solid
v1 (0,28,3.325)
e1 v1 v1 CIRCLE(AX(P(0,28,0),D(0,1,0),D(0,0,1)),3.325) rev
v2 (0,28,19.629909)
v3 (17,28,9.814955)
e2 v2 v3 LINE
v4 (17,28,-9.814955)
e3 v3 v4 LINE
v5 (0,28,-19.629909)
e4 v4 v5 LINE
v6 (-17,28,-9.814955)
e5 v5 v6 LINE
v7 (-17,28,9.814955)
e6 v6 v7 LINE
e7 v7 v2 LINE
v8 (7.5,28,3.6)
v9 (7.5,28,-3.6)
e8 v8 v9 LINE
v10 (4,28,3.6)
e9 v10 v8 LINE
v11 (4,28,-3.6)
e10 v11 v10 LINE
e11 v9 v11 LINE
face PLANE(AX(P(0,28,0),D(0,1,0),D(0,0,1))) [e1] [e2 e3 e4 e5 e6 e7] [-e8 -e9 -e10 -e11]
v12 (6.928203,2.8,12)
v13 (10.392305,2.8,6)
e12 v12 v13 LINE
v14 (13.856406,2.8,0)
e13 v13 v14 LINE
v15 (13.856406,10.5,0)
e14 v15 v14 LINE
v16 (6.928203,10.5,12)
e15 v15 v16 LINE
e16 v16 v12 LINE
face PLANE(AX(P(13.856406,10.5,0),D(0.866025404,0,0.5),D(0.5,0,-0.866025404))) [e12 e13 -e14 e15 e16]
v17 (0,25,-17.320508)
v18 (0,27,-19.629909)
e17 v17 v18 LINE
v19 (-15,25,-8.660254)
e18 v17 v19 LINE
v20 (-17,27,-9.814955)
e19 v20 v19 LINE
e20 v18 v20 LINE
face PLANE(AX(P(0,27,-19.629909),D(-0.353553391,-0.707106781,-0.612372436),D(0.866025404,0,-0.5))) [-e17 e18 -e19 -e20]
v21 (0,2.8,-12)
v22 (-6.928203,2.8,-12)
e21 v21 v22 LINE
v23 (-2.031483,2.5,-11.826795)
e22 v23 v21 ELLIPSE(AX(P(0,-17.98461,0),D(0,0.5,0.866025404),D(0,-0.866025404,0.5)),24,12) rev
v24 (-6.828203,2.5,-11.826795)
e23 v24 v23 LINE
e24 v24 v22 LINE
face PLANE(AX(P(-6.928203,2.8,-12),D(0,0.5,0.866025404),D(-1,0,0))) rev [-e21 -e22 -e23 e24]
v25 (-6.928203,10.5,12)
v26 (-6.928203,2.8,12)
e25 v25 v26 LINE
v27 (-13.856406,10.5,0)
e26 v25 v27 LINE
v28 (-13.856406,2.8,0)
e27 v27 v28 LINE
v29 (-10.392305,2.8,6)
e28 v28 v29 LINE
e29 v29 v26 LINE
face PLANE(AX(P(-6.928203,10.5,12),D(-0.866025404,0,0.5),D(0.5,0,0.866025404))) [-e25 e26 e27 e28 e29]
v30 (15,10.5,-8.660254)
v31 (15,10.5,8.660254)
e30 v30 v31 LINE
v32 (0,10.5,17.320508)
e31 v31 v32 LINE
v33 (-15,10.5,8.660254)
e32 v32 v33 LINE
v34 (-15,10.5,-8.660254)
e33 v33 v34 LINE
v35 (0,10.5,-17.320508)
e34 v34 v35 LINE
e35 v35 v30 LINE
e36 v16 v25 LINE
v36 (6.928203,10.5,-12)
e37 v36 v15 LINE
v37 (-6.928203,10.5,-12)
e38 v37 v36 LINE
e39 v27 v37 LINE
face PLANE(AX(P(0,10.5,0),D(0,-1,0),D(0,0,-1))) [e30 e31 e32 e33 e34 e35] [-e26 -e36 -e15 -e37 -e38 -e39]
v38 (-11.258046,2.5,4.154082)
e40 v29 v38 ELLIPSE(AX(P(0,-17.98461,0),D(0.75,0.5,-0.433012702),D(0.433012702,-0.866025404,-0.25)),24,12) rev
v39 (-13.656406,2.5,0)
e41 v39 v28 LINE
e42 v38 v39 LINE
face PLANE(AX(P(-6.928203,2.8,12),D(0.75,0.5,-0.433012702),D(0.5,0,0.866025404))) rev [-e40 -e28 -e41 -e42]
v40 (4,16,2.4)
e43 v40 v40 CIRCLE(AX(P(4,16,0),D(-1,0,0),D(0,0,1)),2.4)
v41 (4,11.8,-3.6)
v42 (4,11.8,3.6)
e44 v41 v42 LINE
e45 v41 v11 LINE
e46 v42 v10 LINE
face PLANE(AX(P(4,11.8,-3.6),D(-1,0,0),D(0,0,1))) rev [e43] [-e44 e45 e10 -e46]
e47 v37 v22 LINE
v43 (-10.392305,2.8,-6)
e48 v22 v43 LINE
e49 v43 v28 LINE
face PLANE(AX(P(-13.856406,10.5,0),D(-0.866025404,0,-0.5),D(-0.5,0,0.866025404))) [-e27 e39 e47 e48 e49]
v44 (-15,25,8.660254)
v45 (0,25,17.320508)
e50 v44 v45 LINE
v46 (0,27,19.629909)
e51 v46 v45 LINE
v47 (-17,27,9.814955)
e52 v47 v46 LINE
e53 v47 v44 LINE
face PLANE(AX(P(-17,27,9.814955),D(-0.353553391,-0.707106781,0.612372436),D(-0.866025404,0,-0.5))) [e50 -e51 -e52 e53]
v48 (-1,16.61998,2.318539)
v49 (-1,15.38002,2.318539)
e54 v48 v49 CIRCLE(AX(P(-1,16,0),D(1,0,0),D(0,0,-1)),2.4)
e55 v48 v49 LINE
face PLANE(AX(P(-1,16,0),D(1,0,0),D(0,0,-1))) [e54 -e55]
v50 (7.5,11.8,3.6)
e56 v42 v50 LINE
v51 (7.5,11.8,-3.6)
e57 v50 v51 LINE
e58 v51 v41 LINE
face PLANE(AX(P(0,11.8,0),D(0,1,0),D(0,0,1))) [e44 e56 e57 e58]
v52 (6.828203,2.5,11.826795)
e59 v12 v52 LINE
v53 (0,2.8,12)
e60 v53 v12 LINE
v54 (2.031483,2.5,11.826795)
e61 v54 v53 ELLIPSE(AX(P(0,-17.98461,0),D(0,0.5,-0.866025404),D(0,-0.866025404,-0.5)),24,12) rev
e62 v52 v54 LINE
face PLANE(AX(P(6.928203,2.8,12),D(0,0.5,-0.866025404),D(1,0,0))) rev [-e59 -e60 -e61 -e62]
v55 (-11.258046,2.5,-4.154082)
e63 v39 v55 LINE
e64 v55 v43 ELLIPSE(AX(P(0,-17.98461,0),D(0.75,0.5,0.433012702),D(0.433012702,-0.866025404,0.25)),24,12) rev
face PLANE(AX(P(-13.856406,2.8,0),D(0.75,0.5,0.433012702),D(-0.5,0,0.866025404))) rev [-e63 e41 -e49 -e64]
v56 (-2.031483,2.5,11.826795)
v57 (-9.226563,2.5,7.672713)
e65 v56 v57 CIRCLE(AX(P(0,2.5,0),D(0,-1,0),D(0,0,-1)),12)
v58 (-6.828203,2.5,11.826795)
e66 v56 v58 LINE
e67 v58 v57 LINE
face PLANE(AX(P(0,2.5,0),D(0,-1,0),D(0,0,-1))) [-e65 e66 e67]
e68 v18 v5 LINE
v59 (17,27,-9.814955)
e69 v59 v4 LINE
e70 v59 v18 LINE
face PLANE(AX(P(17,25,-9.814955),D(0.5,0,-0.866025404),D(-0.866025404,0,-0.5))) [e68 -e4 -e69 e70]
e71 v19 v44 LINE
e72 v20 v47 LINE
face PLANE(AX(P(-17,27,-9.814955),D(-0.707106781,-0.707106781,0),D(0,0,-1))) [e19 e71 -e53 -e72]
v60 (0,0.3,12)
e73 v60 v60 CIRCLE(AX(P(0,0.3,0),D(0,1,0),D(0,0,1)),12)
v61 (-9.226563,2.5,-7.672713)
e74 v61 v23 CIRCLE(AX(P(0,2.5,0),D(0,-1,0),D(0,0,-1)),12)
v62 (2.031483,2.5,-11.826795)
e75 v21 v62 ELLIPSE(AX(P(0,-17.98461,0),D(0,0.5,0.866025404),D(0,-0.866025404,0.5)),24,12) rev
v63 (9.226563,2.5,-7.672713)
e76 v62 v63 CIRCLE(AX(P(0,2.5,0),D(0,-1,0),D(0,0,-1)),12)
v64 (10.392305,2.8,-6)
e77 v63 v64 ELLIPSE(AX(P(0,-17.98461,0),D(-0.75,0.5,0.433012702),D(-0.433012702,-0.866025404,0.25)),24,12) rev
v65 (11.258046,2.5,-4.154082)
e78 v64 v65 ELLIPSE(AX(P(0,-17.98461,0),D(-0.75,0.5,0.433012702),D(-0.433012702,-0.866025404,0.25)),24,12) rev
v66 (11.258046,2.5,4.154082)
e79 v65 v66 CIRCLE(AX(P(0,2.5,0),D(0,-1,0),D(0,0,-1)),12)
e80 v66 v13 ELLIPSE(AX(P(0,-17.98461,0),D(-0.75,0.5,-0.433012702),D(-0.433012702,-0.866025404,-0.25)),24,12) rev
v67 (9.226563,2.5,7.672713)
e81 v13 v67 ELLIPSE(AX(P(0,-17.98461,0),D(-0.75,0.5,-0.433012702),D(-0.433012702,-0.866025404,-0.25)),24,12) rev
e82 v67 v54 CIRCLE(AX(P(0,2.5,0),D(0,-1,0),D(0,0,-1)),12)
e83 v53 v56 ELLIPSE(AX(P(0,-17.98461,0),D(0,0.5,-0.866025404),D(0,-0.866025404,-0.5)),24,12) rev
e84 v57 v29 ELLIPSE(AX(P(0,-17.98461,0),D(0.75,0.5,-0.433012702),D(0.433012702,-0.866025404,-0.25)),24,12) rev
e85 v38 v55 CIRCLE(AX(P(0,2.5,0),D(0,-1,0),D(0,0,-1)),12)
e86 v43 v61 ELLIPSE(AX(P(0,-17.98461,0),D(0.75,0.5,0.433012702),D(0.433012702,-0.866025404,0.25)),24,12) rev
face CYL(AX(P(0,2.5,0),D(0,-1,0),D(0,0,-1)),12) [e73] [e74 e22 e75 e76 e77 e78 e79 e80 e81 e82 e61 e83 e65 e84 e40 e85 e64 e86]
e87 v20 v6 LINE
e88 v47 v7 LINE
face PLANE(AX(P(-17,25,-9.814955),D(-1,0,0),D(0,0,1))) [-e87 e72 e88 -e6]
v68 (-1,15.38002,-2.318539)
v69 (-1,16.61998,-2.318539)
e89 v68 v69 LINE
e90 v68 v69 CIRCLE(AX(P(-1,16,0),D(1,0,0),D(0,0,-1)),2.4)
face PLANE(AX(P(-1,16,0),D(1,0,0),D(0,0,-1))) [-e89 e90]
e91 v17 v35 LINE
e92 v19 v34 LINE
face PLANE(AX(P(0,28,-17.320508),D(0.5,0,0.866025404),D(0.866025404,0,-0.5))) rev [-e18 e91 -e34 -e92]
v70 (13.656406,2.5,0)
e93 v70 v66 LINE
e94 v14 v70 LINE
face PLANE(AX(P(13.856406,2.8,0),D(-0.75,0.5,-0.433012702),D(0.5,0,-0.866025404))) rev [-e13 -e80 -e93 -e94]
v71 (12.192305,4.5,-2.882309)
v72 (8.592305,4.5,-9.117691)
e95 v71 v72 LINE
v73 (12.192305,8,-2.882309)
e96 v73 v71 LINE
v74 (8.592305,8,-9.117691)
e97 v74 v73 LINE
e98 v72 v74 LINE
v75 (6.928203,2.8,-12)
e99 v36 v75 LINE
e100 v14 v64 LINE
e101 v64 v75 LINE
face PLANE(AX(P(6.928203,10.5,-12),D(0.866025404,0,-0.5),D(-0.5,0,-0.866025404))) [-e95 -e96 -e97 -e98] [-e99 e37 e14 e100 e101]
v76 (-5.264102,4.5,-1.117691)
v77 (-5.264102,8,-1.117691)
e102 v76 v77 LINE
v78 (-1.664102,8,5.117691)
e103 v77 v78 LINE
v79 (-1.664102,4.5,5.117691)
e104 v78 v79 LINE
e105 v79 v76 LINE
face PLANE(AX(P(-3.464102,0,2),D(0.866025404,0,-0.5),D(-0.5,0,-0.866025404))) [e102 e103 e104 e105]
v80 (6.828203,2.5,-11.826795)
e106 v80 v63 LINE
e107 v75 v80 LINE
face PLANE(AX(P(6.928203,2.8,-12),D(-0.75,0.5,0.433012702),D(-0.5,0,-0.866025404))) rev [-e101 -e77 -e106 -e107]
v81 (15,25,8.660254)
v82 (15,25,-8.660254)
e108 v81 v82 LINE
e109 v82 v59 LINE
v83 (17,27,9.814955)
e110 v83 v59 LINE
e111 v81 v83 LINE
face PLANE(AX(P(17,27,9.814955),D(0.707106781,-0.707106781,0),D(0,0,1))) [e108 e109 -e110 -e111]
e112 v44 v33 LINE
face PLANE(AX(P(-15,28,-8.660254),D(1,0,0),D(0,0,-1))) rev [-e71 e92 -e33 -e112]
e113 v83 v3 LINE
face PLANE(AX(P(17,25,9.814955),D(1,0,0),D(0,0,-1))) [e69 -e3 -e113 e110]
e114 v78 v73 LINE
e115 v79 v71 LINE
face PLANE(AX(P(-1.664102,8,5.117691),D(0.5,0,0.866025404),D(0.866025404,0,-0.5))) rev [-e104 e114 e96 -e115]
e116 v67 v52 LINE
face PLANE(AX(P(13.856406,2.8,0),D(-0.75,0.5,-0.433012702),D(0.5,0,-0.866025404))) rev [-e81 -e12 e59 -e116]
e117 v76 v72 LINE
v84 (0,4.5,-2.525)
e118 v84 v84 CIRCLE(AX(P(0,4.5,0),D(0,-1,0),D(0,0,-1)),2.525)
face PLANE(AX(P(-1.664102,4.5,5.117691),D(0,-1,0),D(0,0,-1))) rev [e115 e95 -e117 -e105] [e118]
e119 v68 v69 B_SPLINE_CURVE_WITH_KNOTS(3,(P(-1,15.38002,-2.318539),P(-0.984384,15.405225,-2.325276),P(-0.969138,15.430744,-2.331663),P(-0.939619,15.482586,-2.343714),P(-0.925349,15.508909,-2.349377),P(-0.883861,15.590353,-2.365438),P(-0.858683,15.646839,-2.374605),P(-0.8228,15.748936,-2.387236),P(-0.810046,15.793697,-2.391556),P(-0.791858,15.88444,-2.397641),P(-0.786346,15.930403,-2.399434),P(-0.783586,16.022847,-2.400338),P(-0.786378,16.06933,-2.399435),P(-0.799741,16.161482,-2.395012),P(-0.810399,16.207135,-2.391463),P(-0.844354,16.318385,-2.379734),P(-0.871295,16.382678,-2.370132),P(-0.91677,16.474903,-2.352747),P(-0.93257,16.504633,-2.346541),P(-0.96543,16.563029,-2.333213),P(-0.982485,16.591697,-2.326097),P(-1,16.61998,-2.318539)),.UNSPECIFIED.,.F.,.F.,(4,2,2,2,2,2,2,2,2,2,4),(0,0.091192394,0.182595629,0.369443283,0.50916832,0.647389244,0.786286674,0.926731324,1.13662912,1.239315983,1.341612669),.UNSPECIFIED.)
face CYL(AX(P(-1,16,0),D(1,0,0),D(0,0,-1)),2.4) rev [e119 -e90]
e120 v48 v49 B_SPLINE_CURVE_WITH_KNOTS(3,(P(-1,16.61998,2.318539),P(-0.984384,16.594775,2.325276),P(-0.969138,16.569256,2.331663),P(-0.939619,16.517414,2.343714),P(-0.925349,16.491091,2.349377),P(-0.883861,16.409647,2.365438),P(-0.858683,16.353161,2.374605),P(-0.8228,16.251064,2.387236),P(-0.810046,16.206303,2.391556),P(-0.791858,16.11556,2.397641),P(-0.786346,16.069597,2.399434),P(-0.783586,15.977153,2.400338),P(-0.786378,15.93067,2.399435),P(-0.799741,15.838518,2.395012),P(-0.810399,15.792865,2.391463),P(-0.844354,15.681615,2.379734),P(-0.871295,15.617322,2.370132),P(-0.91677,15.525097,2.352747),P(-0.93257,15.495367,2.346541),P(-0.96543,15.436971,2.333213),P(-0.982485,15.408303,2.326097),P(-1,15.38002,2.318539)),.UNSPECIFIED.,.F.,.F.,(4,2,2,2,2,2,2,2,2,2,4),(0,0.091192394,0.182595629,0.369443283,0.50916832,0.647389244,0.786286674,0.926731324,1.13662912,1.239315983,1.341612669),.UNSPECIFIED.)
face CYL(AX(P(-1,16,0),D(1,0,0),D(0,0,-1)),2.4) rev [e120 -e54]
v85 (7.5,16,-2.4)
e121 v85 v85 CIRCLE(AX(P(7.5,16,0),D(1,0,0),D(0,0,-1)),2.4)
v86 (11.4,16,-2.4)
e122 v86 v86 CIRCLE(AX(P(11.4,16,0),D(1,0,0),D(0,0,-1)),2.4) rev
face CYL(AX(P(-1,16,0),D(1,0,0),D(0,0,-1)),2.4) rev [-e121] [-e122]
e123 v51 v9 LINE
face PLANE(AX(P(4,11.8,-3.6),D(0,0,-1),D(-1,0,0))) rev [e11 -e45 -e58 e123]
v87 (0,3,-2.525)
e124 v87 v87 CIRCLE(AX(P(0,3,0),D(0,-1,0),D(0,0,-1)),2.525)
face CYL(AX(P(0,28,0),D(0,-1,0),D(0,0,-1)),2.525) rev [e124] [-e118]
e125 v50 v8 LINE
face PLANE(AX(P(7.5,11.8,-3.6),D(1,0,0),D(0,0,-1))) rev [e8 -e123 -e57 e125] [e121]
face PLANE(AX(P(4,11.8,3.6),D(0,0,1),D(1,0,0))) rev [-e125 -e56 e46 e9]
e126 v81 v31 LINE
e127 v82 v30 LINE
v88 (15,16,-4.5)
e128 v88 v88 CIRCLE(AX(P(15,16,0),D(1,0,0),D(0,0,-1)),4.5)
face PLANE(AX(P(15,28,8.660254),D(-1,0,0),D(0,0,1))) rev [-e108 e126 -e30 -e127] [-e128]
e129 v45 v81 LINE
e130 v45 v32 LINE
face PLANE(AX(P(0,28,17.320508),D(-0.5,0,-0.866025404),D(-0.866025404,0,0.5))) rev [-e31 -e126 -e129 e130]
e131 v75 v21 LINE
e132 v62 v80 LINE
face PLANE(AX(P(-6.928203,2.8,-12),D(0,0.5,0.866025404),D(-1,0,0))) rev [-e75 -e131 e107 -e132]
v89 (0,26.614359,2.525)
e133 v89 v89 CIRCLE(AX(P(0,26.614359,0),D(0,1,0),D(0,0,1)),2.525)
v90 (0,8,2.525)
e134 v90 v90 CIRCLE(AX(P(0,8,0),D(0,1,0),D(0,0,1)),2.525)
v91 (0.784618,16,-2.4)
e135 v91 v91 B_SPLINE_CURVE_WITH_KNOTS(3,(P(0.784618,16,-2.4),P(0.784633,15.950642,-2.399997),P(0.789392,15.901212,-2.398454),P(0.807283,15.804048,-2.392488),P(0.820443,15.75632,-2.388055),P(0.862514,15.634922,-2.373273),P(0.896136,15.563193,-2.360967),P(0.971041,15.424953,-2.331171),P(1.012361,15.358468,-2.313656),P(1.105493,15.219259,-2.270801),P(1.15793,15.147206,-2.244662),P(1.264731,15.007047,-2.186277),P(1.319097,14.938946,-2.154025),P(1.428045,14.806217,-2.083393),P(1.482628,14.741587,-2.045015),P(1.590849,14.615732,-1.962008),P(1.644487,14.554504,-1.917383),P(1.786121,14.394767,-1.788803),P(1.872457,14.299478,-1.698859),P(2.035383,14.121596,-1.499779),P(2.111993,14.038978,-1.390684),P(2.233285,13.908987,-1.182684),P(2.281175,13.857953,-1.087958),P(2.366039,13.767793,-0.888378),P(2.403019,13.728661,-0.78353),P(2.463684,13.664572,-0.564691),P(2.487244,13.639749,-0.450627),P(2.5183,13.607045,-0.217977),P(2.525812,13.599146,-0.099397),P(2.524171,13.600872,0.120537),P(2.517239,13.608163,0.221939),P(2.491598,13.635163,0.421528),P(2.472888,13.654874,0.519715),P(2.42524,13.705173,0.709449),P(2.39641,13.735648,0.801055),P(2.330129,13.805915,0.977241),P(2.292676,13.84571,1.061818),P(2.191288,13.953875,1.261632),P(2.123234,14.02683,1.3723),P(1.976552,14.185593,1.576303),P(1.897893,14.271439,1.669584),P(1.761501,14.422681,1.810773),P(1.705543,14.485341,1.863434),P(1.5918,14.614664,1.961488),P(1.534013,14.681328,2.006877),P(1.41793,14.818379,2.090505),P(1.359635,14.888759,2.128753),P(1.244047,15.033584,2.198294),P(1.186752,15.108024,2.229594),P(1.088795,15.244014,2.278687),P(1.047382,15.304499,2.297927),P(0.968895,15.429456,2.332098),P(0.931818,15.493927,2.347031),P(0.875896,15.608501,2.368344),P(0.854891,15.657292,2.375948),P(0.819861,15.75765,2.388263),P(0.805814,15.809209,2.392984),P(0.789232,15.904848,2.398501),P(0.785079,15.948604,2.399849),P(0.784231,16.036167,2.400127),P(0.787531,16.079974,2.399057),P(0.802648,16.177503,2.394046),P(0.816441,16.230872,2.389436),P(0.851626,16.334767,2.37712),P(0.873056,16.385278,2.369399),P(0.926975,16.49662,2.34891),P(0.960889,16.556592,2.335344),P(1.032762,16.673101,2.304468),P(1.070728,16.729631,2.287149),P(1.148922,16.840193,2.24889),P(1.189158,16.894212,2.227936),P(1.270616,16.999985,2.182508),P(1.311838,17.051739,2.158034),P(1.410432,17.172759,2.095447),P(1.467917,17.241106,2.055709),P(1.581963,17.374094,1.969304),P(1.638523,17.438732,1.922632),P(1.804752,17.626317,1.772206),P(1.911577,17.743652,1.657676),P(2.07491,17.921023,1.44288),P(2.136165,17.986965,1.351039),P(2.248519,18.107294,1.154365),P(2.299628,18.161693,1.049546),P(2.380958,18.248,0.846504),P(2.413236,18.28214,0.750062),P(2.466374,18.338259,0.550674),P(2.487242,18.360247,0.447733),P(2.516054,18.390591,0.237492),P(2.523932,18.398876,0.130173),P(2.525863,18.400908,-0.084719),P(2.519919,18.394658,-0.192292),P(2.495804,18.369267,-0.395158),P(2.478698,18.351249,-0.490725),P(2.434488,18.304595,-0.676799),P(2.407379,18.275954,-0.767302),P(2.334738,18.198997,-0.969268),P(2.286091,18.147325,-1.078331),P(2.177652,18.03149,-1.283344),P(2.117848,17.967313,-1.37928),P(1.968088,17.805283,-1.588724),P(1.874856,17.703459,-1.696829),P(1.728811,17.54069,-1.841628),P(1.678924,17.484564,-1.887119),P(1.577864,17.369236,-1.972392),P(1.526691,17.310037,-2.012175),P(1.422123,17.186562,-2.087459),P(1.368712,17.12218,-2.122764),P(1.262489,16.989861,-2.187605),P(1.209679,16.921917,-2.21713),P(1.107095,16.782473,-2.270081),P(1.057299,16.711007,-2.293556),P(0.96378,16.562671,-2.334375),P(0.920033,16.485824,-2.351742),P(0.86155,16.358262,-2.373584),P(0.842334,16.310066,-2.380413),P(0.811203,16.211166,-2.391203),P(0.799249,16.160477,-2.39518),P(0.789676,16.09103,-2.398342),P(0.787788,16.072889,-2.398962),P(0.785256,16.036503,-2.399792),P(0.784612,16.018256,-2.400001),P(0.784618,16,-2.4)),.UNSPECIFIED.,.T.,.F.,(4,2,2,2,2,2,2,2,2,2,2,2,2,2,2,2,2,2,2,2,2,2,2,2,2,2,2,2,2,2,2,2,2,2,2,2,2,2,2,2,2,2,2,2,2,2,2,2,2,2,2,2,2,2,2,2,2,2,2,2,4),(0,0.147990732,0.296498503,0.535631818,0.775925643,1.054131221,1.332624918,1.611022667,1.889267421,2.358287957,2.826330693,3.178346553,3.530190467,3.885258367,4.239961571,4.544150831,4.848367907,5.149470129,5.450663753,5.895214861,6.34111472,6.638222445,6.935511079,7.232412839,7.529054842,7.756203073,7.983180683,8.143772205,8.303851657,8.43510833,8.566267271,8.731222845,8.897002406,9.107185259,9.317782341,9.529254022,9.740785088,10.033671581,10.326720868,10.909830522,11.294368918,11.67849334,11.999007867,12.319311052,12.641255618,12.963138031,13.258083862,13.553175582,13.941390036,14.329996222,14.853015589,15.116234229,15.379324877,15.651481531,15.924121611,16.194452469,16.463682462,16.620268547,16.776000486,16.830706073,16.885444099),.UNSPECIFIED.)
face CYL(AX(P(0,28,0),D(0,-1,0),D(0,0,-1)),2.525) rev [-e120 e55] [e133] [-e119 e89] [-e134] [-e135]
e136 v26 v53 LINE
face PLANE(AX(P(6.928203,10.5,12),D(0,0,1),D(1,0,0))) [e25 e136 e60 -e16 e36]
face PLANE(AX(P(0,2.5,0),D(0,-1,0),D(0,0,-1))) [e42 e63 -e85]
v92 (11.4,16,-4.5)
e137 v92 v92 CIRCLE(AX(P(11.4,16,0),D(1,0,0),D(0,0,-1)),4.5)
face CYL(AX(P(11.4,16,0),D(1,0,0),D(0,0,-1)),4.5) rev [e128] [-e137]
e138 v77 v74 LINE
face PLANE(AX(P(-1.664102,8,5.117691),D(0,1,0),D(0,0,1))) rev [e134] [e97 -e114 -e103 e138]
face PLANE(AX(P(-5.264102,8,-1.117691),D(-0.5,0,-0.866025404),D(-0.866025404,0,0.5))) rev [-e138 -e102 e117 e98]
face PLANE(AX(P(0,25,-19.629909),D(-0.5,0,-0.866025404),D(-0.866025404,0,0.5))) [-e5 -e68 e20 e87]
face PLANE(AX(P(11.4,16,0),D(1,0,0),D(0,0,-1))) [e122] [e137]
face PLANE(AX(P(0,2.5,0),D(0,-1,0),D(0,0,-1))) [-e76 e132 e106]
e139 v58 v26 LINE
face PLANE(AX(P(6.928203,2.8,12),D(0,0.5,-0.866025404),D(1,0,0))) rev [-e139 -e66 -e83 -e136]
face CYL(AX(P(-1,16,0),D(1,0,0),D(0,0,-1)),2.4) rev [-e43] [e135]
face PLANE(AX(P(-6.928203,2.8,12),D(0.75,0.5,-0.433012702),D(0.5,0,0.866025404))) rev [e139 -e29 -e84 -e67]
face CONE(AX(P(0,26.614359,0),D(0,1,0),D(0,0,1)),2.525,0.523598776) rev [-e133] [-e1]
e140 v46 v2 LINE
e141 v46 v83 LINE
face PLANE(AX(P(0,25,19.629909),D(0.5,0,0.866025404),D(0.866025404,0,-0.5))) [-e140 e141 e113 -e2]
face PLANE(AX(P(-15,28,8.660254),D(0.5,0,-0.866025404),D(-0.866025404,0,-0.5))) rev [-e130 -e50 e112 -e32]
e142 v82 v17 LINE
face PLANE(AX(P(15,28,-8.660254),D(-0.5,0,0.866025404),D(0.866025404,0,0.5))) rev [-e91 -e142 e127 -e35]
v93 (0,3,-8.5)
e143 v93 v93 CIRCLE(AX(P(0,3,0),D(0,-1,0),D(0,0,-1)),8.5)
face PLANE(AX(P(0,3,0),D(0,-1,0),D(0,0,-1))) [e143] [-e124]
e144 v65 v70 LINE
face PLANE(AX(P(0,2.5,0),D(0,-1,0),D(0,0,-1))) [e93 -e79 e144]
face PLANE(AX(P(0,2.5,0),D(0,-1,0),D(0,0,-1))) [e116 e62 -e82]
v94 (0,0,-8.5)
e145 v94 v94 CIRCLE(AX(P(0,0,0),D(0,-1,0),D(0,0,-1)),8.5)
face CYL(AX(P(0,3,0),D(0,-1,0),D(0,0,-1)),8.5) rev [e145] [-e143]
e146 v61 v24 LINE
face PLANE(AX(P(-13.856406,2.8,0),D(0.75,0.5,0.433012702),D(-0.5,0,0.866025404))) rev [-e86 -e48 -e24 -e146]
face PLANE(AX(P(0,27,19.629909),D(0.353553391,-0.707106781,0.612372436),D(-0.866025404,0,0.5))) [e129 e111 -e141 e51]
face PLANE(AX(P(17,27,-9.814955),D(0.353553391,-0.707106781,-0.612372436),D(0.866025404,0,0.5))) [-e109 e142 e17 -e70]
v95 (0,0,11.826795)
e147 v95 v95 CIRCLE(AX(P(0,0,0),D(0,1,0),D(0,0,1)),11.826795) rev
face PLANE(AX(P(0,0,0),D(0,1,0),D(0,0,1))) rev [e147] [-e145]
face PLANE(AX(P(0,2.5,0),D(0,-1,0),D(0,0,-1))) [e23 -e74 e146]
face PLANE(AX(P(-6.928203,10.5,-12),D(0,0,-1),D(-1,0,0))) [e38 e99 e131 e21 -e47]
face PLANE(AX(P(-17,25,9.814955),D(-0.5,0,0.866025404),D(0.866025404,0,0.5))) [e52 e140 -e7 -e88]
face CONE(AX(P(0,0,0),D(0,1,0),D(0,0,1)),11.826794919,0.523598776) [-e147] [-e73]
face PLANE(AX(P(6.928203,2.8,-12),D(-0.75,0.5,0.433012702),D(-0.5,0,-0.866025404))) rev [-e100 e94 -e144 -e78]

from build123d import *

# Parameters (mm, degrees)
SKIZZE1_R                       = 2.525
AUFSATZ_LINEAR_AUSTRAGEN1_DEPTH = 28
SKIZZE2_W                       = 3.5
SKIZZE2_H                       = 7.2
SCHNITT_LINEAR_AUSTRAGEN1_DEPTH = 16.2
SKIZZE4_R                       = 2.4
SCHNITT_LINEAR_AUSTRAGEN2_DEPTH = 16
SKIZZE6_R                       = 14.009035946
AUFSATZ_LINEAR_AUSTRAGEN3_DEPTH = 3
SKIZZE7_R                       = 20
SCHNITT_LINEAR_AUSTRAGEN4_DEPTH = 10.5
FASE1_SIZE                      = 0.8
FASE1_SIZE2                     = 1.385640646
SKIZZE9_W                       = 7.2
SKIZZE9_H                       = 3.5
SCHNITT_LINEAR_AUSTRAGEN5_DEPTH = 16
SKIZZE10_R                      = 8.5
SCHNITT_LINEAR_AUSTRAGEN6_DEPTH = 3
FASE2_SIZE                      = 2
SKIZZE11_R                      = 4.5
SCHNITT_LINEAR_AUSTRAGEN7_DEPTH = 3.6
SKIZZE12_R                      = 14.338361474
SKIZZE12_R_2                    = 12
SCHNITT_LINEAR_AUSTRAGEN8_DEPTH = 2.5
FASE3_SIZE                      = 0.3
FASE3_SIZE2                     = 0.173205081
FASE4_SIZE                      = 0.173205081
FASE4_SIZE_2                    = 0.3


# Some blends are built 0.0001 mm under size
with BuildPart() as part:
    # Skizze1 → Aufsatz-Linear austragen1 (new body)
    with BuildSketch(Plane(origin=(0, 0, 0), x_dir=(1, 0, 0), z_dir=(0, 1, 0))):
        Polygon((15, 8.660254038), (0, 17.320508076), (-15, 8.660254038), (-15, -8.660254038), (0, -17.320508076), (15, -8.660254038), align=None)
        with Locations(Location((0, 0, 0), (0, 0, 270))):
            Circle(SKIZZE1_R, mode=Mode.SUBTRACT)
    extrude(amount=AUFSATZ_LINEAR_AUSTRAGEN1_DEPTH)

    # Skizze2 → Schnitt-Linear austragen1 (cut)
    with BuildSketch(Plane(origin=(0, 28, 0), x_dir=(1, 0, 0), z_dir=(0, 1, 0))):
        with Locations((5.75, 0)):
            Rectangle(SKIZZE2_W, SKIZZE2_H)
    extrude(amount=-SCHNITT_LINEAR_AUSTRAGEN1_DEPTH, mode=Mode.SUBTRACT)

    # Skizze4 → Schnitt-Linear austragen2 (cut)
    with BuildSketch(Plane(origin=(15, 0, 0), x_dir=(0, 0, -1), z_dir=(1, 0, 0))):
        with Locations((0, 16)):
            Circle(SKIZZE4_R)
    extrude(amount=-SCHNITT_LINEAR_AUSTRAGEN2_DEPTH, mode=Mode.SUBTRACT)

    # Skizze6 → Aufsatz-Linear austragen3 (add)
    with BuildSketch(Plane(origin=(0, 28, 0), x_dir=(1, 0, 0), z_dir=(0, 1, 0))):
        Polygon((0, -19.629909152), (17, -9.814954576), (17, 9.814954576), (0, 19.629909152), (-17, 9.814954576), (-17, -9.814954576), align=None)
        Circle(SKIZZE6_R, mode=Mode.SUBTRACT)
    extrude(amount=-AUFSATZ_LINEAR_AUSTRAGEN3_DEPTH)

    # Skizze7 → Schnitt-Linear austragen4 (cut)
    with BuildSketch(Plane.XZ):
        Circle(SKIZZE7_R)
        Polygon((-6.92820323, 12), (-13.856406461, 0), (-6.92820323, -12), (6.92820323, -12), (13.856406461, 0), (6.92820323, 12), align=None, mode=Mode.SUBTRACT)
    extrude(amount=-SCHNITT_LINEAR_AUSTRAGEN4_DEPTH, mode=Mode.SUBTRACT)

    # Fase1
    fase1_edges = [part.edges().sort_by_distance(p)[0] for p in [
        (0, 28, -2.525),
    ]]
    fase1_side = [part.faces().sort_by_distance(p)[0] for p in [
        (0, 28, -3.044358579),
    ]]
    chamfer(fase1_edges, length=FASE1_SIZE, length2=FASE1_SIZE2, reference=fase1_side[0])

    # Skizze9 → Schnitt-Linear austragen5 (cut)
    with BuildSketch(Plane(origin=(10.392304845, 0, -6), x_dir=(-0.49999999999999983, 0, -0.8660254037844387), z_dir=(0.8660254037844387, 0, -0.49999999999999983))):
        with Locations((0, 6.25)):
            Rectangle(SKIZZE9_W, SKIZZE9_H)
    extrude(amount=-SCHNITT_LINEAR_AUSTRAGEN5_DEPTH, mode=Mode.SUBTRACT)

    # Skizze10 → Schnitt-Linear austragen6 (cut)
    with BuildSketch(Plane.XZ):
        with Locations(Location((0, 0, 0), (0, 0, 270))):
            Circle(SKIZZE10_R)
    extrude(amount=-SCHNITT_LINEAR_AUSTRAGEN6_DEPTH, mode=Mode.SUBTRACT)

    # Fase2
    fase2_edges = [part.edges().sort_by_distance(p)[0] for p in [
        (-8.5, 25, 14.722431864),
        (-17, 25, 0),
        (-8.5, 25, -14.722431864),
        (8.5, 25, -14.722431864),
        (17, 25, 0),
        (8.5, 25, 14.722431864),
    ]]
    chamfer(fase2_edges, length=FASE2_SIZE - 0.0001)  # a hair under: the kernel refuses the full size

    # Skizze11 → Schnitt-Linear austragen7 (cut)
    with BuildSketch(Plane(origin=(15, 0, 0), x_dir=(0, 0, -1), z_dir=(1, 0, 0))):
        with Locations((0, 16)):
            Circle(SKIZZE11_R)
    extrude(amount=-SCHNITT_LINEAR_AUSTRAGEN7_DEPTH, mode=Mode.SUBTRACT)

    # Skizze12 → Schnitt-Linear austragen8 (cut)
    with BuildSketch(Plane.XZ):
        Circle(SKIZZE12_R)
        with Locations(Location((0, 0, 0), (0, 0, 270))):
            Circle(SKIZZE12_R_2, mode=Mode.SUBTRACT)
    extrude(amount=-SCHNITT_LINEAR_AUSTRAGEN8_DEPTH, mode=Mode.SUBTRACT)

    # Fase3
    fase3_edges = [part.edges().sort_by_distance(p)[0] for p in [
        (0, 0, 12),
    ]]
    fase3_side = [part.faces().sort_by_distance(p)[0] for p in [
        (0, 1.25, 12),
    ]]
    chamfer(fase3_edges, length=FASE3_SIZE, length2=FASE3_SIZE2, reference=fase3_side[0])

    # Fase4
    # the kernel refuses this chamfer: 0.3, 0.173205081 mm, written as the material it takes off along each edge
    with BuildSketch(Plane(origin=(-10.392304845, 2.5, 6), x_dir=(0.864572857266567, -0.05789386240267096, -0.4991613718768963), z_dir=(0.5, 0, 0.8660254037844387))) as fase4_piece_1_section:
        Polygon((FASE4_SIZE * 0.998322742353, FASE4_SIZE * 0.0578938623214), (-FASE4_SIZE_2 * 0.0578938624027, FASE4_SIZE_2 * 0.998322743754), (0, 0), align=None)
    fase4_piece_1 = extrude(amount=7.704328957, mode=Mode.PRIVATE)
    fase4_piece_1 = fase4_piece_1 - Plane(origin=(0, 2.602492353, 0), x_dir=(0, 0, -1), z_dir=(0, -1, 0)) * Cylinder(12, 17, mode=Mode.PRIVATE)
    add(fase4_piece_1, mode=Mode.SUBTRACT)
    with BuildSketch(Plane(origin=(-14.244469324, 2.5, -0.672144596), x_dir=(0.864572857266567, -0.05789386240267102, -0.4991613718768963), z_dir=(0.5, 0, 0.8660254037844387))) as fase4_piece_2_section:
        Polygon((FASE4_SIZE * 0.998322742353, FASE4_SIZE * 0.0578938623214), (-FASE4_SIZE_2 * 0.0578938624027, FASE4_SIZE_2 * 0.998322743754), (0, 0), align=None)
    fase4_piece_2 = extrude(amount=7.704328957, mode=Mode.PRIVATE)
    fase4_piece_2 = fase4_piece_2 - Plane(origin=(0, 2.602492354, 0), x_dir=(0, 0, -1), z_dir=(0, -1, 0)) * Cylinder(12, 17, mode=Mode.PRIVATE)
    add(fase4_piece_2, mode=Mode.SUBTRACT)
    with BuildSketch(Plane(origin=(-7.704328957, 2.5, 12), x_dir=(0, -0.057893862402670936, -0.9983227437537926), z_dir=(1, 0, 0))) as fase4_piece_3_section:
        Polygon((FASE4_SIZE * 0.998322742353, FASE4_SIZE * 0.0578938623214), (-FASE4_SIZE_2 * 0.0578938624027, FASE4_SIZE_2 * 0.998322743754), (0, 0), align=None)
    fase4_piece_3 = extrude(amount=7.704328957, mode=Mode.PRIVATE)
    fase4_piece_3 = fase4_piece_3 - Plane(origin=(0, 2.602492354, 0), x_dir=(0, 0, -1), z_dir=(0, -1, 0)) * Cylinder(12, 17, mode=Mode.PRIVATE)
    add(fase4_piece_3, mode=Mode.SUBTRACT)
    with BuildSketch(Plane(origin=(0, 2.5, 12), x_dir=(0, -0.057893862402670936, -0.9983227437537926), z_dir=(1, 0, 0))) as fase4_piece_4_section:
        Polygon((FASE4_SIZE * 0.998322742353, FASE4_SIZE * 0.0578938623214), (-FASE4_SIZE_2 * 0.0578938624027, FASE4_SIZE_2 * 0.998322743754), (0, 0), align=None)
    fase4_piece_4 = extrude(amount=7.704328957, mode=Mode.PRIVATE)
    fase4_piece_4 = fase4_piece_4 - Plane(origin=(0, 2.602492353, 0), x_dir=(0, 0, -1), z_dir=(0, -1, 0)) * Cylinder(12, 17, mode=Mode.PRIVATE)
    add(fase4_piece_4, mode=Mode.SUBTRACT)
    with BuildSketch(Plane(origin=(6.540140367, 2.5, 12.672144596), x_dir=(-0.864572857266567, -0.05789386240267135, -0.49916137187689613), z_dir=(0.4999999999999999, 0, -0.8660254037844388))) as fase4_piece_5_section:
        Polygon((FASE4_SIZE * 0.998322742353, FASE4_SIZE * 0.0578938623214), (-FASE4_SIZE_2 * 0.0578938624027, FASE4_SIZE_2 * 0.998322743754), (0, 0), align=None)
    fase4_piece_5 = extrude(amount=7.704328957, mode=Mode.PRIVATE)
    fase4_piece_5 = fase4_piece_5 - Plane(origin=(0, 2.602492354, 0), x_dir=(0, 0, -1), z_dir=(0, -1, 0)) * Cylinder(12, 17, mode=Mode.PRIVATE)
    add(fase4_piece_5, mode=Mode.SUBTRACT)
    with BuildSketch(Plane(origin=(10.392304845, 2.5, 6), x_dir=(-0.864572857266567, -0.05789386240267096, -0.49916137187689613), z_dir=(0.4999999999999999, 0, -0.8660254037844388))) as fase4_piece_6_section:
        Polygon((FASE4_SIZE * 0.998322742353, FASE4_SIZE * 0.0578938623214), (-FASE4_SIZE_2 * 0.0578938624027, FASE4_SIZE_2 * 0.998322743754), (0, 0), align=None)
    fase4_piece_6 = extrude(amount=7.704328957, mode=Mode.PRIVATE)
    fase4_piece_6 = fase4_piece_6 - Plane(origin=(0, 2.602492353, 0), x_dir=(0, 0, -1), z_dir=(0, -1, 0)) * Cylinder(12, 17, mode=Mode.PRIVATE)
    add(fase4_piece_6, mode=Mode.SUBTRACT)
    with BuildSketch(Plane(origin=(14.244469324, 2.5, 0.672144596), x_dir=(-0.8645728572665671, -0.05789386240267102, 0.49916137187689597), z_dir=(-0.49999999999999967, 0, -0.8660254037844388))) as fase4_piece_7_section:
        Polygon((FASE4_SIZE * 0.998322742353, FASE4_SIZE * 0.0578938623214), (-FASE4_SIZE_2 * 0.0578938624027, FASE4_SIZE_2 * 0.998322743754), (0, 0), align=None)
    fase4_piece_7 = extrude(amount=7.704328957, mode=Mode.PRIVATE)
    fase4_piece_7 = fase4_piece_7 - Plane(origin=(0, 2.602492354, 0), x_dir=(0, 0, -1), z_dir=(0, -1, 0)) * Cylinder(12, 17, mode=Mode.PRIVATE)
    add(fase4_piece_7, mode=Mode.SUBTRACT)
    with BuildSketch(Plane(origin=(10.392304845, 2.5, -6), x_dir=(-0.8645728572665671, -0.05789386240267096, 0.499161371876896), z_dir=(-0.49999999999999967, 0, -0.8660254037844388))) as fase4_piece_8_section:
        Polygon((FASE4_SIZE * 0.998322742353, FASE4_SIZE * 0.0578938623214), (-FASE4_SIZE_2 * 0.0578938624027, FASE4_SIZE_2 * 0.998322743754), (0, 0), align=None)
    fase4_piece_8 = extrude(amount=7.704328957, mode=Mode.PRIVATE)
    fase4_piece_8 = fase4_piece_8 - Plane(origin=(0, 2.602492353, 0), x_dir=(0, 0, -1), z_dir=(0, -1, 0)) * Cylinder(12, 17, mode=Mode.PRIVATE)
    add(fase4_piece_8, mode=Mode.SUBTRACT)
    with BuildSketch(Plane(origin=(7.704328957, 2.5, -12), x_dir=(0, -0.057893862402670936, 0.9983227437537926), z_dir=(-1, 0, 0))) as fase4_piece_9_section:
        Polygon((FASE4_SIZE * 0.998322742353, FASE4_SIZE * 0.0578938623214), (-FASE4_SIZE_2 * 0.0578938624027, FASE4_SIZE_2 * 0.998322743754), (0, 0), align=None)
    fase4_piece_9 = extrude(amount=7.704328957, mode=Mode.PRIVATE)
    fase4_piece_9 = fase4_piece_9 - Plane(origin=(0, 2.602492354, 0), x_dir=(0, 0, -1), z_dir=(0, -1, 0)) * Cylinder(12, 17, mode=Mode.PRIVATE)
    add(fase4_piece_9, mode=Mode.SUBTRACT)
    with BuildSketch(Plane(origin=(0, 2.5, -12), x_dir=(0, -0.057893862402670936, 0.9983227437537926), z_dir=(-1, 0, 0))) as fase4_piece_10_section:
        Polygon((FASE4_SIZE * 0.998322742353, FASE4_SIZE * 0.0578938623214), (-FASE4_SIZE_2 * 0.0578938624027, FASE4_SIZE_2 * 0.998322743754), (0, 0), align=None)
    fase4_piece_10 = extrude(amount=7.704328957, mode=Mode.PRIVATE)
    fase4_piece_10 = fase4_piece_10 - Plane(origin=(0, 2.602492354, 0), x_dir=(0, 0, -1), z_dir=(0, -1, 0)) * Cylinder(12, 17, mode=Mode.PRIVATE)
    add(fase4_piece_10, mode=Mode.SUBTRACT)
    with BuildSketch(Plane(origin=(-6.540140367, 2.5, -12.672144596), x_dir=(0.864572857266567, -0.05789386240267136, 0.49916137187689624), z_dir=(-0.4999999999999999, 0, 0.8660254037844387))) as fase4_piece_11_section:
        Polygon((FASE4_SIZE * 0.998322742353, FASE4_SIZE * 0.0578938623214), (-FASE4_SIZE_2 * 0.0578938624027, FASE4_SIZE_2 * 0.998322743754), (0, 0), align=None)
    fase4_piece_11 = extrude(amount=7.704328957, mode=Mode.PRIVATE)
    fase4_piece_11 = fase4_piece_11 - Plane(origin=(0, 2.602492354, 0), x_dir=(0, 0, -1), z_dir=(0, -1, 0)) * Cylinder(12, 17, mode=Mode.PRIVATE)
    add(fase4_piece_11, mode=Mode.SUBTRACT)
    with BuildSketch(Plane(origin=(-10.392304845, 2.5, -6), x_dir=(0.864572857266567, -0.05789386240267096, 0.49916137187689624), z_dir=(-0.4999999999999999, 0, 0.8660254037844387))) as fase4_piece_12_section:
        Polygon((FASE4_SIZE * 0.998322742353, FASE4_SIZE * 0.0578938623214), (-FASE4_SIZE_2 * 0.0578938624027, FASE4_SIZE_2 * 0.998322743754), (0, 0), align=None)
    fase4_piece_12 = extrude(amount=7.704328957, mode=Mode.PRIVATE)
    fase4_piece_12 = fase4_piece_12 - Plane(origin=(0, 2.602492353, 0), x_dir=(0, 0, -1), z_dir=(0, -1, 0)) * Cylinder(12, 17, mode=Mode.PRIVATE)
    add(fase4_piece_12, mode=Mode.SUBTRACT)


solid = part.part
